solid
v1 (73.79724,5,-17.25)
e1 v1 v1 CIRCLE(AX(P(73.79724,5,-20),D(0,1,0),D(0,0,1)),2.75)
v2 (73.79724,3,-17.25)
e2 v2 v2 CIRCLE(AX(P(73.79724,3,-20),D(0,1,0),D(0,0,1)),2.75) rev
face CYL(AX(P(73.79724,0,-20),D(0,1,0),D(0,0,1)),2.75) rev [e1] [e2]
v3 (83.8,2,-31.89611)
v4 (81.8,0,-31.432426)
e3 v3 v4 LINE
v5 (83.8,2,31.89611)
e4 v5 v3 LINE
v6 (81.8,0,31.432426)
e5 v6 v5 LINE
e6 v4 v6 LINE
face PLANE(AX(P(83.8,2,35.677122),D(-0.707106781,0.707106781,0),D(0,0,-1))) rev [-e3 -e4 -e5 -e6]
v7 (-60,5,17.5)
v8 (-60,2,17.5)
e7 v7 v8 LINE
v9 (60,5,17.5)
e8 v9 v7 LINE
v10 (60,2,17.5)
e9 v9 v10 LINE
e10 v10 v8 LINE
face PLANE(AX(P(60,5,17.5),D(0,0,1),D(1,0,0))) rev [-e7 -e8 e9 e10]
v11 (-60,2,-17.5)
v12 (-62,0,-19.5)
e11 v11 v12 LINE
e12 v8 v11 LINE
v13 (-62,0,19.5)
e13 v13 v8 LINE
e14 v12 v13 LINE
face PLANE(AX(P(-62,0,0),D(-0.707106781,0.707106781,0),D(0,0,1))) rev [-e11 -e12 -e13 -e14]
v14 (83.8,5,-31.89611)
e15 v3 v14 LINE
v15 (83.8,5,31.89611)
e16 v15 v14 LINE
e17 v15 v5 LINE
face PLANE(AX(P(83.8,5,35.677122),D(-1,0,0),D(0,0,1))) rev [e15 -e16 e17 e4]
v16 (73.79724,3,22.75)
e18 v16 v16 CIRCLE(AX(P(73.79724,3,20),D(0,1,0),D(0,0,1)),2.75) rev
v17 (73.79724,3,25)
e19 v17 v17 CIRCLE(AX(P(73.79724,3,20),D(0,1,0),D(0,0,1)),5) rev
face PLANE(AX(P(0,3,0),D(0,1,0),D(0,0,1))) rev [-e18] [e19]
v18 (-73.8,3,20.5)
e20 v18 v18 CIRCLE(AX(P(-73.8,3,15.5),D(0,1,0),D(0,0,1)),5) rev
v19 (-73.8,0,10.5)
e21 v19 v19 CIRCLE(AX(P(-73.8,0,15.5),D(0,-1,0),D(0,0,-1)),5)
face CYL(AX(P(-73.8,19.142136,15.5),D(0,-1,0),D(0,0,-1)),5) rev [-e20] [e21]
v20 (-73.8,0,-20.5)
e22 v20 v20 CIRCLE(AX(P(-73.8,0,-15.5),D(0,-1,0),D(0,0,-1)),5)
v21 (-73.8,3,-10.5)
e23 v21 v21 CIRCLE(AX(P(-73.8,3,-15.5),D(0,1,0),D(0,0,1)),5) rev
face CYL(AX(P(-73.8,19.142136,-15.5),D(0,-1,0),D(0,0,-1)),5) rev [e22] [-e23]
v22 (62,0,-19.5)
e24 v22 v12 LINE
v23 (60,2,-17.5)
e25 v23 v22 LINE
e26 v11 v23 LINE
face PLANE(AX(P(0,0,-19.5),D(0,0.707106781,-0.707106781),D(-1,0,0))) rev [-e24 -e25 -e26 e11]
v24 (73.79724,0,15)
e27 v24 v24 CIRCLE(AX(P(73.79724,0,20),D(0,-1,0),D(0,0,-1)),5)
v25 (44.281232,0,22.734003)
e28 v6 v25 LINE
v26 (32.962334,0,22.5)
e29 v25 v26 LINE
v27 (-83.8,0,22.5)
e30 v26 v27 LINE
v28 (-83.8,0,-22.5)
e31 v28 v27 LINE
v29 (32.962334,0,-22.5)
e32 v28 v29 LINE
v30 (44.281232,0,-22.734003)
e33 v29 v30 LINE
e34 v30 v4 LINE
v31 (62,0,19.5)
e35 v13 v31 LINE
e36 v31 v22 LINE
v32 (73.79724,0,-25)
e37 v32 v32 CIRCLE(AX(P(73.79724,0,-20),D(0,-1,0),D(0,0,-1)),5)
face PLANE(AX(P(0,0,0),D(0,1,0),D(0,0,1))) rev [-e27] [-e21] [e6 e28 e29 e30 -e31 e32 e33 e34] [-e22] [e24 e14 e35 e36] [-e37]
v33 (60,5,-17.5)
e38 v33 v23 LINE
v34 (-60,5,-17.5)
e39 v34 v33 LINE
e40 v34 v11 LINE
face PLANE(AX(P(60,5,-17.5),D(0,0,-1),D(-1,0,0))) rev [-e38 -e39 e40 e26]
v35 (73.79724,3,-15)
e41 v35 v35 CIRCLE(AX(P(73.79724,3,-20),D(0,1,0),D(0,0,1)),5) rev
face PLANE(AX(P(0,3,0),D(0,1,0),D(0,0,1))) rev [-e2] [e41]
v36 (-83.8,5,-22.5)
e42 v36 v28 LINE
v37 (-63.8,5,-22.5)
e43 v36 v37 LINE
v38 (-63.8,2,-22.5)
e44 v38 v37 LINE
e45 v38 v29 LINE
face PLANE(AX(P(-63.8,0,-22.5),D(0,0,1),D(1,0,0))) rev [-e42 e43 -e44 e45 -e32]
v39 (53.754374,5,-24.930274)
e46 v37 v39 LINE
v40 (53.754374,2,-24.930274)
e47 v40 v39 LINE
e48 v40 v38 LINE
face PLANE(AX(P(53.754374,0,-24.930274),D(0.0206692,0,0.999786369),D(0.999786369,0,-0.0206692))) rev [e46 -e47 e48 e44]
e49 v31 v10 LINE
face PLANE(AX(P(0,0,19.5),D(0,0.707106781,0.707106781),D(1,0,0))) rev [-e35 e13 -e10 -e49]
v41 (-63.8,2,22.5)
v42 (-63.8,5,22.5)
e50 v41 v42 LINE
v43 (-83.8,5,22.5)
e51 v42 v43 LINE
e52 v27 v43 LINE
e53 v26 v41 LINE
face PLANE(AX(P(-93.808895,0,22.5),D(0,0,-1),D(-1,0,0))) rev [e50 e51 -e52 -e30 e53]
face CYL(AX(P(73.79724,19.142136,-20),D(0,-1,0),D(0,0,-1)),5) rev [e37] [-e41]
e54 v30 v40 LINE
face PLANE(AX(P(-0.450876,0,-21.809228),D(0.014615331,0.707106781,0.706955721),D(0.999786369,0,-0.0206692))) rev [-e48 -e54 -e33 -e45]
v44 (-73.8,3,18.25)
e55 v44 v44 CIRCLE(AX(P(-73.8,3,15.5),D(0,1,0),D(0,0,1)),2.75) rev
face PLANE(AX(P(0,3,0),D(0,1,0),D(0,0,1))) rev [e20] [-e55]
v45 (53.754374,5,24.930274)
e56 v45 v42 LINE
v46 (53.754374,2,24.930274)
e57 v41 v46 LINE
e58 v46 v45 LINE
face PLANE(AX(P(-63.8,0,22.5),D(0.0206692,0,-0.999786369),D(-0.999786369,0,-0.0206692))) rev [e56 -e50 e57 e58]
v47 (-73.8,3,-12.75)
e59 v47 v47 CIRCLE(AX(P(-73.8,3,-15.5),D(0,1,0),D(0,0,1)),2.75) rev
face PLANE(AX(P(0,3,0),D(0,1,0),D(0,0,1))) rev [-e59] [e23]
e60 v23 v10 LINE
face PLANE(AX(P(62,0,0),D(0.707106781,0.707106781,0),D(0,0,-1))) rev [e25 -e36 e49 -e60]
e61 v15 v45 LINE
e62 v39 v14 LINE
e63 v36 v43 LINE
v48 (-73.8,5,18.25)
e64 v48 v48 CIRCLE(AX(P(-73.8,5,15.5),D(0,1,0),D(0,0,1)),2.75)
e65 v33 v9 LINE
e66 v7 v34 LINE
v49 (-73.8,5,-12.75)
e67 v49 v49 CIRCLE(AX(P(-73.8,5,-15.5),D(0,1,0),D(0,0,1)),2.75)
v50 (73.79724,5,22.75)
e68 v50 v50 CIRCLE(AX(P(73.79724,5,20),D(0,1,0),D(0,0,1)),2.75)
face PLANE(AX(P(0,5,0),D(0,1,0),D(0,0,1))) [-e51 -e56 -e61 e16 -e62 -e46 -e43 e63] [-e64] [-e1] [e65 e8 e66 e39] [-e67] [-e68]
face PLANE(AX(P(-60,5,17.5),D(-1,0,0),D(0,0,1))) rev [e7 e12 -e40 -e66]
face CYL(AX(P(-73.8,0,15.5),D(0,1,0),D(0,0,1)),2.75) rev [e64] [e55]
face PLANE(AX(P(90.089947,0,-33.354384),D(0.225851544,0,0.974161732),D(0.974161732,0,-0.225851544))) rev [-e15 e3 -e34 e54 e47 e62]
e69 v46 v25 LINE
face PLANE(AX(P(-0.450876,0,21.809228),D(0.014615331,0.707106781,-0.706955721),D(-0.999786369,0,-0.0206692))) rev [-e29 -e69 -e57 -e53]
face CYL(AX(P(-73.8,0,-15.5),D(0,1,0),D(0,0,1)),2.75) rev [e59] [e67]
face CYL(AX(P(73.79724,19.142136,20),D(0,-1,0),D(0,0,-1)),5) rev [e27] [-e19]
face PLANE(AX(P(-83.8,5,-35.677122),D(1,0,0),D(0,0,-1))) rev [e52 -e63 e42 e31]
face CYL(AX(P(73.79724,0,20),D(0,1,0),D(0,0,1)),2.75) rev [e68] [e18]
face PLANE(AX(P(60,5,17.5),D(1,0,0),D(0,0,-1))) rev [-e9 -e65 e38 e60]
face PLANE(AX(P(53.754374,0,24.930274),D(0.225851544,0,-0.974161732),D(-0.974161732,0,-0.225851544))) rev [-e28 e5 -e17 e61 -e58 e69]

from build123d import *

# Parameters (mm, degrees)
BOSS_EXTRUDE1_DEPTH     = 5
CUT_EXTRUDE1_DEPTH      = 92.215662378
CUT_EXTRUDE1_DEPTH_BACK = 92.215662378
SKETCH2_R               = 2.75
CUT_EXTRUDE2_DEPTH      = 92.215662378
CUT_EXTRUDE2_DEPTH_BACK = 92.215662378
CHAMFER3_SIZE           = 2
CUT_EXTRUDE3_DEPTH      = 90.804241831
CUT_EXTRUDE3_DEPTH_BACK = 90.804241831
SKETCH4_W               = 120
SKETCH4_H               = 35
CHAMFER4_SIZE           = 2
SKETCH5_R               = 5
CUT_EXTRUDE4_DEPTH      = 3


with BuildPart() as part:
    # Sketch1 → Boss-Extrude1 (new body)
    with BuildSketch(Plane(origin=(0, 0, 0), x_dir=(1, 0, 0), z_dir=(0, 1, 0))):
        Polygon((-73.8, 35.677122405), (-83.8, 35.677122405), (-83.8, -35.677122405), (-73.8, -35.677122405), (73.8, -35.677122405), (83.8, -35.677122405), (83.8, 35.677122405), (73.8, 35.677122405), align=None)
    extrude(amount=BOSS_EXTRUDE1_DEPTH)

    # Sketch2 → Cut-Extrude1 (cut, two sides: drawn at the far end of the back side and taken through both)
    with BuildSketch(Plane(origin=(0, 5, 0), x_dir=(1, 0, 0), z_dir=(0, 1, 0)).offset(-CUT_EXTRUDE1_DEPTH_BACK)):
        with Locations(Location((-73.8, -15.5, 0), (0, 0, 270))):
            Circle(SKETCH2_R)
        with Locations(Location((-73.8, 15.5, 0), (0, 0, 270))):
            Circle(SKETCH2_R)
        with Locations(Location((73.797239672, -20, 0), (0, 0, 270))):
            Circle(SKETCH2_R)
        with Locations(Location((73.797239672, 20, 0), (0, 0, 270))):
            Circle(SKETCH2_R)
    extrude(amount=CUT_EXTRUDE1_DEPTH + CUT_EXTRUDE1_DEPTH_BACK, mode=Mode.SUBTRACT)

    # Sketch3 → Cut-Extrude2 (cut, two sides: drawn at the far end of the back side and taken through both)
    with BuildSketch(Plane(origin=(0, 5, 0), x_dir=(1, 0, 0), z_dir=(0, 1, 0)).offset(-CUT_EXTRUDE2_DEPTH_BACK)):
        Polygon((-63.8, -22.5), (53.754373535, -24.93027399), (90.089947098, -33.354383806), (45.106765394, -114.519737278), (-93.808894925, -48.481732373), (-93.808894925, -22.5), align=None)
        Polygon((53.754373535, 24.93027399), (-63.8, 22.5), (-93.808894925, 22.5), (-93.808894925, 75.103676807), (90.089947098, 109.537779365), (90.089947098, 33.354383806), align=None)
    extrude(amount=CUT_EXTRUDE2_DEPTH + CUT_EXTRUDE2_DEPTH_BACK, mode=Mode.SUBTRACT)

    # Chamfer3
    # the kernel refuses this chamfer: 2 mm, written as the material it takes off along each edge
    with BuildSketch(Plane(origin=(83.8, 0, 37.039476252), x_dir=(-0.9996219169112968, -0.027495876610586292, 0), z_dir=(0, 0, -1))) as chamfer3_piece_1:
        Polygon((CHAMFER3_SIZE * 0.999621916911, CHAMFER3_SIZE * 0.0274958766106), (-CHAMFER3_SIZE * 0.0274958766106, CHAMFER3_SIZE * 0.999621916911), (0, 0), align=None)
    extrude(amount=74.078952505, mode=Mode.SUBTRACT)
    with BuildSketch(Plane(origin=(58.89664073, 0, 25.036583248), x_dir=(0.020661384909083567, -0.027495876610586414, -0.9994083669566981), z_dir=(-0.9997863692752371, 0, -0.020669199583903272))) as chamfer3_piece_2_section:
        Polygon((CHAMFER3_SIZE * 0.999621916911, -CHAMFER3_SIZE * 0.0274958766106), (-CHAMFER3_SIZE * 0.0274958766106, -CHAMFER3_SIZE * 0.999621916911), (0, 0), align=None)
    chamfer3_piece_2 = extrude(amount=127.866224079, mode=Mode.PRIVATE)
    chamfer3_piece_2 = split(chamfer3_piece_2, bisect_by=Plane(origin=(6.389506061, 0.738517017, 22.5), z_dir=(0, 0, 1)), keep=Keep.TOP, mode=Mode.PRIVATE)
    chamfer3_piece_2 = split(chamfer3_piece_2, bisect_by=Plane(origin=(8.475011093, 0.738517017, 14.432618822), z_dir=(-0.22585154444898248, 0, 0.9741617318854243)), keep=Keep.TOP, mode=Mode.PRIVATE)
    add(chamfer3_piece_2, mode=Mode.SUBTRACT)
    with BuildSketch(Plane(origin=(-68.942267195, 0, -22.393690742), x_dir=(0.020661384909228912, -0.027495876610586358, 0.9994083669566951), z_dir=(0.9997863692752341, 0, -0.02066919958404867))) as chamfer3_piece_3_section:
        Polygon((CHAMFER3_SIZE * 0.999621916911, -CHAMFER3_SIZE * 0.0274958766106), (-CHAMFER3_SIZE * 0.0274958766106, -CHAMFER3_SIZE * 0.999621916911), (0, 0), align=None)
    chamfer3_piece_3 = extrude(amount=127.866224079, mode=Mode.PRIVATE)
    chamfer3_piece_3 = split(chamfer3_piece_3, bisect_by=Plane(origin=(6.389506061, 0.738517017, -22.5), z_dir=(0, 0, -1)), keep=Keep.TOP, mode=Mode.PRIVATE)
    chamfer3_piece_3 = split(chamfer3_piece_3, bisect_by=Plane(origin=(8.475011093, 0.738517017, -14.432618822), z_dir=(-0.22585154444898248, 0, -0.9741617318854243)), keep=Keep.TOP, mode=Mode.PRIVATE)
    add(chamfer3_piece_3, mode=Mode.SUBTRACT)

    # Sketch4 → Cut-Extrude3 (cut, two sides: drawn at the far end of the back side and taken through both)
    with BuildSketch(Plane.XZ.offset(-CUT_EXTRUDE3_DEPTH_BACK)):
        Rectangle(SKETCH4_W, SKETCH4_H)
    extrude(amount=CUT_EXTRUDE3_DEPTH + CUT_EXTRUDE3_DEPTH_BACK, mode=Mode.SUBTRACT)

    # Chamfer4
    chamfer4_edges = [part.edges().sort_by_distance(p)[0] for p in [
        (0, 0, -17.5),
        (60, 0, 0),
        (0, 0, 17.5),
        (-60, 0, 0),
    ]]
    chamfer(chamfer4_edges, length=CHAMFER4_SIZE)

    # Sketch5 → Cut-Extrude4 (cut)
    with BuildSketch(Plane.XZ):
        with Locations(Location((-73.8, 15.5, 0), (0, 0, 270))):
            Circle(SKETCH5_R)
        with Locations(Location((-73.8, -15.5, 0), (0, 0, 270))):
            Circle(SKETCH5_R)
        with Locations(Location((73.797239672, 20, 0), (0, 0, 270))):
            Circle(SKETCH5_R)
        with Locations(Location((73.797239672, -20, 0), (0, 0, 270))):
            Circle(SKETCH5_R)
    extrude(amount=-CUT_EXTRUDE4_DEPTH, mode=Mode.SUBTRACT)


solid = part.part
